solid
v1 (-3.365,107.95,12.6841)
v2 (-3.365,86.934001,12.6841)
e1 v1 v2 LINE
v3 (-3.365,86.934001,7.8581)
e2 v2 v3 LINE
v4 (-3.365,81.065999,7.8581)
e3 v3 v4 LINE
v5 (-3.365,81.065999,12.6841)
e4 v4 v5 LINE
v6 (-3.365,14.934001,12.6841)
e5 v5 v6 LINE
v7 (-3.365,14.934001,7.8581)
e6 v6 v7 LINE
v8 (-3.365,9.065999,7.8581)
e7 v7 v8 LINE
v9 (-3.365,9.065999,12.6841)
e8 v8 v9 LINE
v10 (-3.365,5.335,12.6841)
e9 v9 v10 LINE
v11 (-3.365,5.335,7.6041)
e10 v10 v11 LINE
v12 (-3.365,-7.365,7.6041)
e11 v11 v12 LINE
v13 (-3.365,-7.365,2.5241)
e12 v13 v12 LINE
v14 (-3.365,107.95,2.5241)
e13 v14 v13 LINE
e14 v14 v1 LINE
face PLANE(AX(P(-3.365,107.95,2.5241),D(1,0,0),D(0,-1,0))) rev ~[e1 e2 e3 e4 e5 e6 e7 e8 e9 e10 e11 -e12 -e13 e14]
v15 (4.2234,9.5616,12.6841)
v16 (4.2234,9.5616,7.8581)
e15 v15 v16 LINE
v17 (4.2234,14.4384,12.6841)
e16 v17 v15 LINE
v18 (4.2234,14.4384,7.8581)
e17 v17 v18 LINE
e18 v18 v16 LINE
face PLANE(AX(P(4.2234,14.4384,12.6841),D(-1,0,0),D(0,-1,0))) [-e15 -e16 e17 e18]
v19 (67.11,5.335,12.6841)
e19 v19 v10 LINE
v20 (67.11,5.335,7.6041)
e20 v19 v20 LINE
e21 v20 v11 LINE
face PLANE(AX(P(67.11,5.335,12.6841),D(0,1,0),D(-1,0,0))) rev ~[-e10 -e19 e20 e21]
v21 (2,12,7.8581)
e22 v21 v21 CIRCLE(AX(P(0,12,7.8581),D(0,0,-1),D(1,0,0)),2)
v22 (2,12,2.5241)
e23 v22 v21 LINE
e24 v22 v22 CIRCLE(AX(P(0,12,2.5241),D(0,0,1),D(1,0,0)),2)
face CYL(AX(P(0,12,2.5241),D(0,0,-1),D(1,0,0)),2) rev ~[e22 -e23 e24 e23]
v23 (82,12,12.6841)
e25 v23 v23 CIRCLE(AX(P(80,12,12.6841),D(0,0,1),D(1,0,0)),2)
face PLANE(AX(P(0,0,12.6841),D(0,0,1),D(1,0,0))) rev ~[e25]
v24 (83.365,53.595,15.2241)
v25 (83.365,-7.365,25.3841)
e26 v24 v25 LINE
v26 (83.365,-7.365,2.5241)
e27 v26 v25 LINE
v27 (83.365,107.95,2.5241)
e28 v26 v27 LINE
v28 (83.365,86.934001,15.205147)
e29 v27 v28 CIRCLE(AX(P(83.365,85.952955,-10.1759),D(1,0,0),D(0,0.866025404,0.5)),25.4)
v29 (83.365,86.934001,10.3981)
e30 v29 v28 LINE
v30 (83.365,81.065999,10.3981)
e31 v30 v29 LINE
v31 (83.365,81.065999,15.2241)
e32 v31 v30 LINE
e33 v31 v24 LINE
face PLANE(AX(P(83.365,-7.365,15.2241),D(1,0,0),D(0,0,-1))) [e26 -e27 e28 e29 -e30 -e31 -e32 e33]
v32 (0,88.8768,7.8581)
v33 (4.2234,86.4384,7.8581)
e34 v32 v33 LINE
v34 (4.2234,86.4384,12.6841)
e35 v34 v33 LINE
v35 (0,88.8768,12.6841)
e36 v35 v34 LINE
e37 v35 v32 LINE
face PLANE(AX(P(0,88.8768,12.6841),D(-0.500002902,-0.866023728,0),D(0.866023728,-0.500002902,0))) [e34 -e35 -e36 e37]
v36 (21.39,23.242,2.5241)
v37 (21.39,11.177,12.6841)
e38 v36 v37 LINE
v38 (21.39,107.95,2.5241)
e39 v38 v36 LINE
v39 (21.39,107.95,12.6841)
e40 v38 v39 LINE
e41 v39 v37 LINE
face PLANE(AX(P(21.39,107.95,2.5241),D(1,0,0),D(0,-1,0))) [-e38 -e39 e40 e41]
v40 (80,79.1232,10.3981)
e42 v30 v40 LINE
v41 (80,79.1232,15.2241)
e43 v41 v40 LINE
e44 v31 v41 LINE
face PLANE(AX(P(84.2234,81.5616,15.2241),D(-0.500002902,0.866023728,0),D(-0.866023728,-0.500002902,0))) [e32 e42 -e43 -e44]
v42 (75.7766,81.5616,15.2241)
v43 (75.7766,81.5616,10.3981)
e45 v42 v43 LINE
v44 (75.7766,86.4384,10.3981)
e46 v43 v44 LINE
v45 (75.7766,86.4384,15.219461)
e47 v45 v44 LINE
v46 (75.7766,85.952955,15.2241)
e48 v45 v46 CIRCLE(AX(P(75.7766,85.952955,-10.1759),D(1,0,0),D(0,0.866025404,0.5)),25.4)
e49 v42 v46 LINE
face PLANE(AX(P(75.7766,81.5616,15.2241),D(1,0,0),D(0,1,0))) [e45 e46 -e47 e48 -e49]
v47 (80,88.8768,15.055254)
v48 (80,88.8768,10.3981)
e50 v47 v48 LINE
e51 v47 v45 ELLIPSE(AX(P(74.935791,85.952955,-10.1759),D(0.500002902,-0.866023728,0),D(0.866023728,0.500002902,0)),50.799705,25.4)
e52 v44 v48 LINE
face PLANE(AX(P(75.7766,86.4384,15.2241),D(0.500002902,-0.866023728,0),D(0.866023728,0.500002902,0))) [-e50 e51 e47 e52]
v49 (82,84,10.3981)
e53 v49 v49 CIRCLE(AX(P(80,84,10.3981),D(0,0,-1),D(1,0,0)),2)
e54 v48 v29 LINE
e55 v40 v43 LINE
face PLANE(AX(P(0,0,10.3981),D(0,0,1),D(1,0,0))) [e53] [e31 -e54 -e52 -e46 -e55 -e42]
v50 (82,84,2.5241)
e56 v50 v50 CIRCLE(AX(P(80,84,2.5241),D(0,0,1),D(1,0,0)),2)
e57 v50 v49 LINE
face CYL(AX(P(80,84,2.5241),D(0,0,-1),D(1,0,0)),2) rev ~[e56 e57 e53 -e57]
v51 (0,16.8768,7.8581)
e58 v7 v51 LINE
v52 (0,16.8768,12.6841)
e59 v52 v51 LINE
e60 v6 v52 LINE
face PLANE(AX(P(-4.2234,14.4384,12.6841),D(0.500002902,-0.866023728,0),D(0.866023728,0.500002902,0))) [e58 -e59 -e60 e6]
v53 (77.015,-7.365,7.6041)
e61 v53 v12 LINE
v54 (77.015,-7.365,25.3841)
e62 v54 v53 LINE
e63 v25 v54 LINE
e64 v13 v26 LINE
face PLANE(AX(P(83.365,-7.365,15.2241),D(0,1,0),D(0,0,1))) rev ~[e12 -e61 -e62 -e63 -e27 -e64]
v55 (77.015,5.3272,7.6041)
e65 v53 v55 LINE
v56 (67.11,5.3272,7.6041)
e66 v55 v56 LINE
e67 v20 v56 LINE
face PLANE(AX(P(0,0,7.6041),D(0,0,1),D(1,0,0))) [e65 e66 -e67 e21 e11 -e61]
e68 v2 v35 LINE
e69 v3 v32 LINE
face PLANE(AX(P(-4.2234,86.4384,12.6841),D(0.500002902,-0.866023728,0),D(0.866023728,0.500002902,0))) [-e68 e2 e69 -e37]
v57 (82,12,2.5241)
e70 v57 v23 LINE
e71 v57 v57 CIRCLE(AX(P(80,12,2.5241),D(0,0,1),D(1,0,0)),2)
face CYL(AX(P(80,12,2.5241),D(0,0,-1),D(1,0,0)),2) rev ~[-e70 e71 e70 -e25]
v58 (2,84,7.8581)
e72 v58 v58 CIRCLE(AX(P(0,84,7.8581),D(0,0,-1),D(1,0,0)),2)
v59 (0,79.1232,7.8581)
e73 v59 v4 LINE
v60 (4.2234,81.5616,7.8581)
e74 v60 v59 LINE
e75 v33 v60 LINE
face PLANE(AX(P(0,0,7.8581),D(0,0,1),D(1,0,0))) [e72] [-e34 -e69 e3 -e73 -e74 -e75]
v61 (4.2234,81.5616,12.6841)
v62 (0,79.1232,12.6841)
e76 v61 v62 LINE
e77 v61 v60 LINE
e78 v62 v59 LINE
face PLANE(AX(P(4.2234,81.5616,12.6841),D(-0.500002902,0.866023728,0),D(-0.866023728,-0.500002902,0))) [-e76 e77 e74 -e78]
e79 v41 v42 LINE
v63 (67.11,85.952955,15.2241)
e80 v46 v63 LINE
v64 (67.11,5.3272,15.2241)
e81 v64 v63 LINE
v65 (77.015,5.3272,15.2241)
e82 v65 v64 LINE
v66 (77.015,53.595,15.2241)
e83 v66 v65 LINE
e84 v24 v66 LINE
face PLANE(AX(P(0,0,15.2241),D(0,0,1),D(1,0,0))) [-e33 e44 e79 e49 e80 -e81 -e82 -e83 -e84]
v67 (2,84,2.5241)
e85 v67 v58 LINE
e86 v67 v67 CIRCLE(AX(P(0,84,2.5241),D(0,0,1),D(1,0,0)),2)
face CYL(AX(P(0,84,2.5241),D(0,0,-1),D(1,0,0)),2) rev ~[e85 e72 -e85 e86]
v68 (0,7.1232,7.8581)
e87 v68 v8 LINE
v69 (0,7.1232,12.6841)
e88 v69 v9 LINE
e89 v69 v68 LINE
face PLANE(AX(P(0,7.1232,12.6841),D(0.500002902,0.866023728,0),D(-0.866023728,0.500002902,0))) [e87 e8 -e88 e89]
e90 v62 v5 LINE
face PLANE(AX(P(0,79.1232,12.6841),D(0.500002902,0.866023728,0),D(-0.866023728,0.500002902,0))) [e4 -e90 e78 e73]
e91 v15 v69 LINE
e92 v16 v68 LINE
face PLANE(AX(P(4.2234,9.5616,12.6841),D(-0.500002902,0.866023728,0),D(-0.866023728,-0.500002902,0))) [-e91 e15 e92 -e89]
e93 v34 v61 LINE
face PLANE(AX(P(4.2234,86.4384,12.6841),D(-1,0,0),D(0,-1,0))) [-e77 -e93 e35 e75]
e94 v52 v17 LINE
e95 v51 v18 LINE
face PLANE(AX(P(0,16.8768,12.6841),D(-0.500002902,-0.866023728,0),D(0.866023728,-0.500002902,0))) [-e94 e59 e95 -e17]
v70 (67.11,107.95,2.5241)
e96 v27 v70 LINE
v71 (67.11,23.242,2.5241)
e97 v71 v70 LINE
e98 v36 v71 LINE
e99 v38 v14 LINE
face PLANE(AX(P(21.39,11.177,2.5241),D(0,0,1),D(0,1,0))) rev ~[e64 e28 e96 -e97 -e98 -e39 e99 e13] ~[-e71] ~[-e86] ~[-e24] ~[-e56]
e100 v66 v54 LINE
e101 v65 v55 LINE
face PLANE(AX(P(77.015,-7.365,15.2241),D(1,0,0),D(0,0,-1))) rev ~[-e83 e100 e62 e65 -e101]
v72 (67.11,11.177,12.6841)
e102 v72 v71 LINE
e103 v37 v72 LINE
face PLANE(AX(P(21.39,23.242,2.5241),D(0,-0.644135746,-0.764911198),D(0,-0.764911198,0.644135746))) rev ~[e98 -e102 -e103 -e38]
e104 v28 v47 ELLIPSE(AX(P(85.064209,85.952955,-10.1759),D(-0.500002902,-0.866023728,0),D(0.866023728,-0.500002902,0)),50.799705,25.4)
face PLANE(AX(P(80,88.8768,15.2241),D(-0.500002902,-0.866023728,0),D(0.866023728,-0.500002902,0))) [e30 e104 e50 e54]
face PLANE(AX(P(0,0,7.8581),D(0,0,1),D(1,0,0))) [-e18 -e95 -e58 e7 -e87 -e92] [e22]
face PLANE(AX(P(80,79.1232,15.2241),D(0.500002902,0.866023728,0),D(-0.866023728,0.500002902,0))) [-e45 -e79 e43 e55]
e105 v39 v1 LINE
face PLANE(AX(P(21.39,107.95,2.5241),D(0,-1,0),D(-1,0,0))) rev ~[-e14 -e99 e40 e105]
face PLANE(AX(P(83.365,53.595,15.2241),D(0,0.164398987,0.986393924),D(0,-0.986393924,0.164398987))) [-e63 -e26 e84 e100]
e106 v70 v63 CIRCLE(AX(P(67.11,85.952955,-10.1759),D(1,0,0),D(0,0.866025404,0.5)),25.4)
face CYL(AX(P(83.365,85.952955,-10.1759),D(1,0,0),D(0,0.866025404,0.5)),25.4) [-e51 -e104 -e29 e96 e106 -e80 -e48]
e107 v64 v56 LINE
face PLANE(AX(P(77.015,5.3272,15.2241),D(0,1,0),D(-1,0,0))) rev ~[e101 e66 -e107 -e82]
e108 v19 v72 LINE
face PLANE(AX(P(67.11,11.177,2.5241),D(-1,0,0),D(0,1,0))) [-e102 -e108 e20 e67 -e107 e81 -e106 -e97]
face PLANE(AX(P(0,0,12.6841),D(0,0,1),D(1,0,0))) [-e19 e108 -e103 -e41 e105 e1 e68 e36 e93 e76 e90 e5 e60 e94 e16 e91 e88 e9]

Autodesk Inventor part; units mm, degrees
ref_plane "YZ Plane" through (0, 0, 0) normal (1, 0, 0) x (0, 1, 0)
ref_plane "XZ Plane" through (0, 0, 0) normal (0, 1, 0) x (-1, 0, 0)
ref_plane "Work Plane1" through (0, 0, 2.5241) normal (0, 0, 1) x (1, 0, 0)
sketch "Sketch1" plane through (0, 0, 2.5241) normal (0, 0, 1) x (1, 0, 0)
  line L0 (-4, 272) -> (-4, -8) construction
  line L1 (4, 272) -> (4, -8) construction
  line L2 (76, 272) -> (76, -8) construction
  line L3 (84, 272) -> (84, -8) construction
  line L4 (84, -8) -> (-4, -8) construction
  line L5 (84, 106) -> (80, 106) construction
  line L6 (80, 110) -> (76, 110) construction
  line L7 (-3.365, 272) -> (-3.365, -7.365) construction
  line L8 (-3.365, -7.365) -> (83.365, -7.365) construction
  line L9 (83.365, -7.365) -> (83.365, 272) construction
  line L10 (-3.365, -7.365) -> (83.365, -7.365)
  line L11 (83.365, -7.365) -> (83.365, 107.95)
  line L12 (-3.365, 107.95) -> (-3.365, -7.365)
  circle A0 centre (0, 12) radius 2
  circle A1 centre (80, 12) radius 2
  circle A2 centre (0, 84) radius 2
  circle A3 centre (80, 84) radius 2
  line L13 (21.39, 107.95) -> (21.39, 11.177)
  line L14 (21.39, 11.177) -> (67.11, 11.177)
  line L15 (67.11, 11.177) -> (67.11, 107.95)
  line L16 (83.365, 107.95) -> (67.11, 107.95)
  line L17 (21.39, 107.95) -> (-3.365, 107.95)
  point P0 (0, 0)
  dimension "d0" = 0.635
  dimension "d1" = 8.89
  dimension "d2" = 45.72
  dimension "d18" = 18.542
extrude "Extrusion1" add sketch "Sketch1" along normal blind 10.16
sketch "Sketch2" plane through (0, 0, 12.6841) normal (0, 0, 1) x (1, 0, 0)
  line L0 (83.365, 107.95) -> (67.11, 107.95) projected
  line L1 (83.365, -7.365) -> (83.365, 107.95) projected
  line L2 (67.11, 107.95) -> (83.365, 107.95)
  line L3 (83.365, 107.95) -> (83.365, 23.8125)
  line L4 (67.11, 23.8125) -> (67.11, 107.95)
  circle A0 centre (80, 84) radius 2 projected
  circle A1 centre (80, 84) radius 1.9939
  line L5 (83.365, 23.8125) -> (83.365, -7.365)
  line L6 (83.365, -7.365) -> (67.11, -7.365)
  line L7 (67.11, -7.365) -> (67.11, 23.8125)
  point P0 (0, 0)
  dimension "d5" = 3.9878
extrude "Extrusion2" add sketch "Sketch2" along normal blind 2.54 contours L1 L6 L7 L4 L0
fillet "Fillet1" radius 25.4 1 edges at (75.2375, 107.95, 15.2241)
sketch "Sketch3" plane through (0, 0, 12.6841) normal (0, 0, 1) x (1, 0, 0)
  circle A0 centre (0, 12) radius 2 construction
  circle A1 centre (0, 12) radius 4.8768 construction
  circle A2 centre (0, 84) radius 2 construction
  circle A3 centre (0, 84) radius 4.8768 construction
  circle A4 centre (80, 12) radius 2 construction
  line L0 (0, 16.8768) -> (4.2234, 14.4384)
  line L1 (4.2234, 14.4384) -> (4.2234, 9.5616)
  line L2 (4.2234, 9.5616) -> (0, 7.1232)
  line L3 (0, 7.1232) -> (-4.2234, 9.5616)
  line L4 (-4.2234, 9.5616) -> (-4.2234, 14.4384)
  line L5 (-4.2234, 14.4384) -> (0, 16.8768)
  line L6 (0, 88.8768) -> (4.2234, 86.4384)
  line L7 (4.2234, 86.4384) -> (4.2234, 81.5616)
  line L8 (4.2234, 81.5616) -> (0, 79.1232)
  line L9 (0, 79.1232) -> (-4.2234, 81.5616)
  line L10 (-4.2234, 81.5616) -> (-4.2234, 86.4384)
  line L11 (-4.2234, 86.4384) -> (0, 88.8768)
  point P0 (0, 0)
  dimension "d9" = 9.7536
  dimension "d10" = 9.7536
extrude "Extrusion3" cut sketch "Sketch3" against normal blind 4.826
sketch "Sketch4" plane through (0, 0, 15.2241) normal (0, 0, 1) x (1, 0, 0)
  circle A0 centre (80, 84) radius 2 construction
  circle A1 centre (80, 84) radius 4.8768 construction
  line L0 (80, 88.8768) -> (84.2234, 86.4384)
  line L1 (84.2234, 86.4384) -> (84.2234, 81.5616)
  line L2 (84.2234, 81.5616) -> (80, 79.1232)
  line L3 (80, 79.1232) -> (75.7766, 81.5616)
  line L4 (75.7766, 81.5616) -> (75.7766, 86.4384)
  line L5 (75.7766, 86.4384) -> (80, 88.8768)
  point P0 (0, 0)
  dimension "d14" = 9.7536
extrude "Extrusion4" cut sketch "Sketch4" against normal blind 4.826
sketch "Sketch5" plane through (0, 0, 12.6841) normal (0, 0, 1) x (1, 0, 0)
  line L0 (-3.365, -7.365) -> (67.11, -7.365) projected
  line L1 (-3.365, -7.365) -> (67.11, -7.365)
  line L2 (67.11, 5.335) -> (-3.365, 5.335)
  line L3 (-3.365, 5.335) -> (-3.365, -7.365)
  line L4 (67.11, 5.335) -> (67.11, -7.365)
  line L5 (-3.365, -7.365) -> (83.365, -7.365) projected
  point P0 (0, 0)
extrude "Extrusion5" cut sketch "Sketch5" against normal blind 5.08
sketch "Sketch13" plane through (83.365, -7.365, 15.2241) normal (1, 0, 0) x (0, 0, -1)
  line L0 (0, 0) -> (7.62, 0) projected
  line L1 (0, 0) -> (-10.16, 0)
  line L2 (0, 93.318) -> (0, 0) projected
  line L3 (0, 0) -> (0, 60.96)
  line L4 (0, 60.96) -> (-10.16, 0)
  point P0 (15.2241, 7.365)
  dimension "d54" = 10.16
  dimension "d55" = 60.96
extrude "Extrusion13" add sketch "Sketch13" against normal blind 6.35
sketch "Sketch14" plane through (0, 0, 15.2241) normal (0, 0, 1) x (1, 0, 0)
  line L0 (67.11, -7.365) -> (77.015, -7.365) projected
  line L1 (77.015, -7.365) -> (77.015, 53.595) projected
  line L2 (67.11, -7.365) -> (77.015, -7.365)
  line L3 (77.015, -7.365) -> (77.015, 5.3272)
  line L4 (77.015, 5.3272) -> (67.11, 5.3272)
  line L5 (67.11, 5.3272) -> (67.11, -7.365)
  point P0 (0, 0)
extrude "Extrusion14" cut sketch "Sketch14" against normal up to surface (7.62 mm away)
sketch "Sketch15" plane through (21.39, 11.177, 2.5241) normal (1, 0, 0) x (0, 0, -1)
  line L0 (0, 0) -> (-10.16, 0) projected
  line L1 (0, 0) -> (-10.16, 0)
  line L2 (0, 0) -> (0, 12.065)
  line L3 (-10.16, 0) -> (-10.16, 96.773) projected
  line L4 (0, 12.065) -> (-10.16, 0)
  point P0 (2.5241, -11.177)
  dimension "d60" = 12.065
extrude "Extrusion15" add sketch "Sketch15" along normal up to next
equation "\"d61\" = d60"
properties part number "Back Wall with slant"
